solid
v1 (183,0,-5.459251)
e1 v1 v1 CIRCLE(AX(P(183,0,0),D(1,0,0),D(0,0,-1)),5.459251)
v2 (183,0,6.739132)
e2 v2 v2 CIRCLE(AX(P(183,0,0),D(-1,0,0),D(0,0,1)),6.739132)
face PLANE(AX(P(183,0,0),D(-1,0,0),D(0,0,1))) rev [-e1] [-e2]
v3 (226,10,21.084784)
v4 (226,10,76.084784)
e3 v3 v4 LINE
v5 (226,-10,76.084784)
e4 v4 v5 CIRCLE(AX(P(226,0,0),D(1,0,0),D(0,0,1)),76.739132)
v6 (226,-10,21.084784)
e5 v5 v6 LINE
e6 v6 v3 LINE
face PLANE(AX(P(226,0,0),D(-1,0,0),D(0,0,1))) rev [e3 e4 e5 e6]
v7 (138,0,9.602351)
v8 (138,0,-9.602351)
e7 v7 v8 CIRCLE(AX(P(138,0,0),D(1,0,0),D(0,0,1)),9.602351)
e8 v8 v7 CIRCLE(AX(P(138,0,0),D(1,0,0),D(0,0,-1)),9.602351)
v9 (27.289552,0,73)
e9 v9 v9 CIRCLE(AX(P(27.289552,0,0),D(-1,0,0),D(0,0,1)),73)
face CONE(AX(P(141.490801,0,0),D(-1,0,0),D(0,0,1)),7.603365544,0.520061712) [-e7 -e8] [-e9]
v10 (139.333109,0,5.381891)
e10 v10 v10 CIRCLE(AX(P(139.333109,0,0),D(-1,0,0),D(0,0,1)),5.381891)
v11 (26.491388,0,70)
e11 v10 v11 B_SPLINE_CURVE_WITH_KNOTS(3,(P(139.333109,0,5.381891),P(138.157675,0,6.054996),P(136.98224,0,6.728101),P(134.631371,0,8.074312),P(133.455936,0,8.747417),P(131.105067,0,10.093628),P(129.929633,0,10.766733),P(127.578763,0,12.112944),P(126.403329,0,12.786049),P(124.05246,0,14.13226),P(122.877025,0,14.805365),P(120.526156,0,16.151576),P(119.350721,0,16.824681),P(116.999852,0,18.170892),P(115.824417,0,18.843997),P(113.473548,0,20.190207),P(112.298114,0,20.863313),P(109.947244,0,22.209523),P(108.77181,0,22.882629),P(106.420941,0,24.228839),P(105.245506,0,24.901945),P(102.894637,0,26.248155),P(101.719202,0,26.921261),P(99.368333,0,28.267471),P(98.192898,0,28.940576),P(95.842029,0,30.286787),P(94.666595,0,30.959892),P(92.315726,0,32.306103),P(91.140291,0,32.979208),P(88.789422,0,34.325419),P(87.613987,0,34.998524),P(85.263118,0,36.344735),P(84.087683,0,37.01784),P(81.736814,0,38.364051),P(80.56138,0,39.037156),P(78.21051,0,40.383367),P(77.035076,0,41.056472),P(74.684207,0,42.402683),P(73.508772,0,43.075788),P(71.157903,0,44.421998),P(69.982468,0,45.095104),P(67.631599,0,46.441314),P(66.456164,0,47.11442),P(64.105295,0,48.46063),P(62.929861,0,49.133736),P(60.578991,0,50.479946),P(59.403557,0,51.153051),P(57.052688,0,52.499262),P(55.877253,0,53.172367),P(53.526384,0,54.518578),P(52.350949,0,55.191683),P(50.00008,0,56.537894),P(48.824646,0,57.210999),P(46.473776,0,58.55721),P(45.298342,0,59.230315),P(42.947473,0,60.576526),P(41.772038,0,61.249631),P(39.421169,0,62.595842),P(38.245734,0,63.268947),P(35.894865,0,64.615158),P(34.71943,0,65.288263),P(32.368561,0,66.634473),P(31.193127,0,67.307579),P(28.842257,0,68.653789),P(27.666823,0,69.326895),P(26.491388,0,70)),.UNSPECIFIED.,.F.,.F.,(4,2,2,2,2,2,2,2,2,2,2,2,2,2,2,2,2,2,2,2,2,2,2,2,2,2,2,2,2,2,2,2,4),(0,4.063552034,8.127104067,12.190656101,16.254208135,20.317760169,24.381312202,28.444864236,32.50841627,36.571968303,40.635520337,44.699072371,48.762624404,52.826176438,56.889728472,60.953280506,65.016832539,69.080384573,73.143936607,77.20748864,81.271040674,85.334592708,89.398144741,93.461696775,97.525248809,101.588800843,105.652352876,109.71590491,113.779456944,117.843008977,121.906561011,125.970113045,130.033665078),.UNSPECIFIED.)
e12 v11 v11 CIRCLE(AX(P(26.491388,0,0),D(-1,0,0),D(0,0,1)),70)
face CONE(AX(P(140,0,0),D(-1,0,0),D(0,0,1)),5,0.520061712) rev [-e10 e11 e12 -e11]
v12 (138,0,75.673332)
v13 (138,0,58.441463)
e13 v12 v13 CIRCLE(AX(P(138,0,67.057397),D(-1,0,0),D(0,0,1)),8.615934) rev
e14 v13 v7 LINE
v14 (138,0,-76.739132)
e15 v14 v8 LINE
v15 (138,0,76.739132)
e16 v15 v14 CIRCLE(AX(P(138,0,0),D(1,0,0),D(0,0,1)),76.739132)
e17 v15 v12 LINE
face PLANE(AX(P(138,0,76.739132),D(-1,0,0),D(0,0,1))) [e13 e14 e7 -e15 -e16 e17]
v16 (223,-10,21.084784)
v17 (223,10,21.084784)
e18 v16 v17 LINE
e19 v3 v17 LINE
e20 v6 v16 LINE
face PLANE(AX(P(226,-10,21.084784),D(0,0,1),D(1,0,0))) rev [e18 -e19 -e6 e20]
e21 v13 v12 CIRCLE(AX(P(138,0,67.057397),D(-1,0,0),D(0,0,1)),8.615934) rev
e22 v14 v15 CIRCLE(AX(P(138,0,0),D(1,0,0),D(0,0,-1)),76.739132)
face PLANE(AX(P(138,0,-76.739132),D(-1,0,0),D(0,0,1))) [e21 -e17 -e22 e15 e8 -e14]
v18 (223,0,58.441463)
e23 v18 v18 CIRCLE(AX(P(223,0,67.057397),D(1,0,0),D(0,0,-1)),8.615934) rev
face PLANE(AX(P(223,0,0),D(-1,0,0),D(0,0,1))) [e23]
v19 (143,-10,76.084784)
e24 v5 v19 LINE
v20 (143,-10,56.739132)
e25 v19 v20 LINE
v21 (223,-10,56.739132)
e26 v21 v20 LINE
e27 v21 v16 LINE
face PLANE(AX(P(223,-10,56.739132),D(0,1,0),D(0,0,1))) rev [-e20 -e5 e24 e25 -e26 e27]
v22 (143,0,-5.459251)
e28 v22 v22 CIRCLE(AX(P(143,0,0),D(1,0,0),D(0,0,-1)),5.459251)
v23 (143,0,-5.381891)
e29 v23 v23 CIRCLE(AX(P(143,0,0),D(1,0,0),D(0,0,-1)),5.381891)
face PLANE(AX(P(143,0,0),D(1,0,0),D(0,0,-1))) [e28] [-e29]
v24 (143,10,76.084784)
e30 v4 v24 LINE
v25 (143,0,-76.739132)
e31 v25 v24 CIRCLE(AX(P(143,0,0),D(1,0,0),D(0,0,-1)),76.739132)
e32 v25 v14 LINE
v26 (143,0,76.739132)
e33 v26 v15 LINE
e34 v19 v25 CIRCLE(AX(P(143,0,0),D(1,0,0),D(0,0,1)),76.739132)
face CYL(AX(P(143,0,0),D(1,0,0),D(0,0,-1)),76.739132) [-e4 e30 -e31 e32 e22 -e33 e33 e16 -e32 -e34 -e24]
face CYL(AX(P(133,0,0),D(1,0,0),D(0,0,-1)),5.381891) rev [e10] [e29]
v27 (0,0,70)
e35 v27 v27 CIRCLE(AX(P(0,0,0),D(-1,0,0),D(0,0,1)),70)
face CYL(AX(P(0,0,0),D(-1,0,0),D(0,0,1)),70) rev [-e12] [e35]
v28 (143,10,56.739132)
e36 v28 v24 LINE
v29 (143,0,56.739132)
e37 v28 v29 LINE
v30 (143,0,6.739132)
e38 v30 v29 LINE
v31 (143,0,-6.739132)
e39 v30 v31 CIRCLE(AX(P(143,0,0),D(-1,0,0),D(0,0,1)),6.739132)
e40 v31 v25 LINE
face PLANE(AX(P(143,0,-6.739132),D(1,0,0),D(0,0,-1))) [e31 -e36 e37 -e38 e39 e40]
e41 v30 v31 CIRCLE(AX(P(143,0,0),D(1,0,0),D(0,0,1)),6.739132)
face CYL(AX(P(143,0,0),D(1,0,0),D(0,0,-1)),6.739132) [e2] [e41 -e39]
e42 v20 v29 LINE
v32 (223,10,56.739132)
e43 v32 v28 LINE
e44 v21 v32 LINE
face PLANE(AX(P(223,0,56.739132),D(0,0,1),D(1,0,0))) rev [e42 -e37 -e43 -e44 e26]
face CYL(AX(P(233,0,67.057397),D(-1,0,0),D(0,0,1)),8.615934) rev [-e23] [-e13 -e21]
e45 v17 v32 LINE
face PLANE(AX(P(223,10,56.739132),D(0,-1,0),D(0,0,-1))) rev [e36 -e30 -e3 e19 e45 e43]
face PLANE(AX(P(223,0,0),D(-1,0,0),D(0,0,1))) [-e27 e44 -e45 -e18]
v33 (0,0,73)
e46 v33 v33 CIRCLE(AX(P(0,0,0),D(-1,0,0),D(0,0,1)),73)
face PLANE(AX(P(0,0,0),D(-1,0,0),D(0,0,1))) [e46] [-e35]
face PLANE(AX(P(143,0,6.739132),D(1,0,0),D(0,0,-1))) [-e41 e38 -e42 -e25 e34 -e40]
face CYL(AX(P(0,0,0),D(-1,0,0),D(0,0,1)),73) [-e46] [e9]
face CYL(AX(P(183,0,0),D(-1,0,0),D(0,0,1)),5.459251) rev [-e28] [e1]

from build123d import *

# Parameters (mm, degrees)
SHELL_1_T                = 3
SKETCH_4_R               = 5.381890803
CUT_EXTRUDE_2_DEPTH      = 10
SWEEP_START              = 143
SWEEP_2_OUTLINE_R        = 6.739132173
SWEEP_2_DEPTH            = 40
SKETCH_7_R               = 5.459251346
CUT_EXTRUDE_3_DEPTH      = 40
EXTRUDE_5_DEPTH          = 80
CUT_EXTRUDE_4_DEPTH      = 10
CUT_EXTRUDE_4_DEPTH_BACK = 90
SKETCH_12_R              = 8.615934325
EXTRUDE_6_DEPTH          = 3


# Read off the part's stored shape, not the designer's step: 扫描2
with BuildPart() as part:
    # 草图1 → 旋转1 (revolve)
    with BuildSketch(Plane(origin=(0, 0, 0), x_dir=(1, 0, 0), z_dir=(0, 1, 0)), mode=Mode.PRIVATE) as revolve_1_sk:
        Polygon((0, 0), (140, 0), (140, 5), (26.491388223, 70), (0, 70), align=None)
    revolve(revolve_1_sk.sketch.rotate(Axis((0, 0, 0), (1, 0, 0)), 180), axis=Axis((0, 0, 0), (1, 0, 0)))

    # 抽壳1
    shell_1_openings = [part.faces().sort_by_distance(p)[0] for p in [
        (0, 0, 0),
    ]]
    offset(amount=SHELL_1_T, openings=shell_1_openings, kind=Kind.INTERSECTION)

    # 草图4 → 切除-拉伸2 (cut)
    with BuildSketch(Plane(origin=(143, 0, 0), x_dir=(0, 0, -1), z_dir=(1, 0, 0))):
        Circle(SKETCH_4_R)
    extrude(amount=-CUT_EXTRUDE_2_DEPTH, mode=Mode.SUBTRACT)

    # 扫描2 outline → 扫描2 (add)
    with BuildSketch(Plane.YZ.offset(SWEEP_START)):
        Circle(SWEEP_2_OUTLINE_R)
    extrude(amount=SWEEP_2_DEPTH)

    # 草图7 → 切除-拉伸3 (cut)
    with BuildSketch(Plane(origin=(143, 0, 0), x_dir=(0, 0, -1), z_dir=(1, 0, 0))):
        Circle(SKETCH_7_R)
    extrude(amount=CUT_EXTRUDE_3_DEPTH, mode=Mode.SUBTRACT)

    # 扫描3: sweep along a curve in space
    with BuildLine() as sweep_3_path:
        ThreePointArc((143, 0, 6.739132173), (143, 4.765286059, 4.765286059), (143, 6.739132173, 0))
        ThreePointArc((143, 6.739132173, 0), (143, 4.765286059, -4.765286059), (143, 0, -6.739132173))
        ThreePointArc((143, 0, -6.739132173), (143, -4.765286059, -4.765286059), (143, -6.739132173, 0))
        ThreePointArc((143, -6.739132173, 0), (143, -4.765286059, 4.765286059), (143, 0, 6.739132173))
    # 草图9 → 扫描3 (sweep)
    with BuildSketch(Plane(origin=(0, 0, 0), x_dir=(1, 0, 0), z_dir=(0, 1, 0))):
        Polygon((143, 6.739132173), (143, 76.739132173), (138, 76.739132173), (138, 9.602351051), align=None)
    sweep(path=sweep_3_path.line)

    # 草图10 → 凸台-拉伸5 (add)
    with BuildSketch(Plane(origin=(143, 0, 0), x_dir=(0, 0, -1), z_dir=(1, 0, 0))):
        with BuildLine():
            Line((-56.739132173, 0), (-56.739132173, 10))
            Line((-56.739132173, 10), (-76.084784331, 10))
            ThreePointArc((-76.084784331, 10), (-76.739132173, 0), (-76.084784331, -10))
            Line((-76.084784331, -10), (-56.739132173, -10))
            Line((-56.739132173, -10), (-56.739132173, 0))
        make_face()
    extrude(amount=EXTRUDE_5_DEPTH)

    # 草图12 → 切除-拉伸4 (cut, two sides: drawn at the far end of the back side and taken through both)
    with BuildSketch(Plane(origin=(223, 0, 0), x_dir=(0, 0, -1), z_dir=(1, 0, 0)).offset(-CUT_EXTRUDE_4_DEPTH_BACK)):
        with Locations((-67.05739748, 0)):
            Circle(SKETCH_12_R)
    extrude(amount=CUT_EXTRUDE_4_DEPTH + CUT_EXTRUDE_4_DEPTH_BACK, mode=Mode.SUBTRACT)

    # 草图11 → 凸台-拉伸6 (add)
    with BuildSketch(Plane(origin=(223, 0, 0), x_dir=(0, 0, -1), z_dir=(1, 0, 0))):
        with BuildLine():
            Line((-76.084784331, 10), (-21.084784331, 10))
            Line((-21.084784331, 10), (-21.084784331, -10))
            Line((-21.084784331, -10), (-76.084784331, -10))
            ThreePointArc((-76.084784331, -10), (-76.739132173, 0), (-76.084784331, 10))
        make_face()
    extrude(amount=EXTRUDE_6_DEPTH)


solid = part.part
